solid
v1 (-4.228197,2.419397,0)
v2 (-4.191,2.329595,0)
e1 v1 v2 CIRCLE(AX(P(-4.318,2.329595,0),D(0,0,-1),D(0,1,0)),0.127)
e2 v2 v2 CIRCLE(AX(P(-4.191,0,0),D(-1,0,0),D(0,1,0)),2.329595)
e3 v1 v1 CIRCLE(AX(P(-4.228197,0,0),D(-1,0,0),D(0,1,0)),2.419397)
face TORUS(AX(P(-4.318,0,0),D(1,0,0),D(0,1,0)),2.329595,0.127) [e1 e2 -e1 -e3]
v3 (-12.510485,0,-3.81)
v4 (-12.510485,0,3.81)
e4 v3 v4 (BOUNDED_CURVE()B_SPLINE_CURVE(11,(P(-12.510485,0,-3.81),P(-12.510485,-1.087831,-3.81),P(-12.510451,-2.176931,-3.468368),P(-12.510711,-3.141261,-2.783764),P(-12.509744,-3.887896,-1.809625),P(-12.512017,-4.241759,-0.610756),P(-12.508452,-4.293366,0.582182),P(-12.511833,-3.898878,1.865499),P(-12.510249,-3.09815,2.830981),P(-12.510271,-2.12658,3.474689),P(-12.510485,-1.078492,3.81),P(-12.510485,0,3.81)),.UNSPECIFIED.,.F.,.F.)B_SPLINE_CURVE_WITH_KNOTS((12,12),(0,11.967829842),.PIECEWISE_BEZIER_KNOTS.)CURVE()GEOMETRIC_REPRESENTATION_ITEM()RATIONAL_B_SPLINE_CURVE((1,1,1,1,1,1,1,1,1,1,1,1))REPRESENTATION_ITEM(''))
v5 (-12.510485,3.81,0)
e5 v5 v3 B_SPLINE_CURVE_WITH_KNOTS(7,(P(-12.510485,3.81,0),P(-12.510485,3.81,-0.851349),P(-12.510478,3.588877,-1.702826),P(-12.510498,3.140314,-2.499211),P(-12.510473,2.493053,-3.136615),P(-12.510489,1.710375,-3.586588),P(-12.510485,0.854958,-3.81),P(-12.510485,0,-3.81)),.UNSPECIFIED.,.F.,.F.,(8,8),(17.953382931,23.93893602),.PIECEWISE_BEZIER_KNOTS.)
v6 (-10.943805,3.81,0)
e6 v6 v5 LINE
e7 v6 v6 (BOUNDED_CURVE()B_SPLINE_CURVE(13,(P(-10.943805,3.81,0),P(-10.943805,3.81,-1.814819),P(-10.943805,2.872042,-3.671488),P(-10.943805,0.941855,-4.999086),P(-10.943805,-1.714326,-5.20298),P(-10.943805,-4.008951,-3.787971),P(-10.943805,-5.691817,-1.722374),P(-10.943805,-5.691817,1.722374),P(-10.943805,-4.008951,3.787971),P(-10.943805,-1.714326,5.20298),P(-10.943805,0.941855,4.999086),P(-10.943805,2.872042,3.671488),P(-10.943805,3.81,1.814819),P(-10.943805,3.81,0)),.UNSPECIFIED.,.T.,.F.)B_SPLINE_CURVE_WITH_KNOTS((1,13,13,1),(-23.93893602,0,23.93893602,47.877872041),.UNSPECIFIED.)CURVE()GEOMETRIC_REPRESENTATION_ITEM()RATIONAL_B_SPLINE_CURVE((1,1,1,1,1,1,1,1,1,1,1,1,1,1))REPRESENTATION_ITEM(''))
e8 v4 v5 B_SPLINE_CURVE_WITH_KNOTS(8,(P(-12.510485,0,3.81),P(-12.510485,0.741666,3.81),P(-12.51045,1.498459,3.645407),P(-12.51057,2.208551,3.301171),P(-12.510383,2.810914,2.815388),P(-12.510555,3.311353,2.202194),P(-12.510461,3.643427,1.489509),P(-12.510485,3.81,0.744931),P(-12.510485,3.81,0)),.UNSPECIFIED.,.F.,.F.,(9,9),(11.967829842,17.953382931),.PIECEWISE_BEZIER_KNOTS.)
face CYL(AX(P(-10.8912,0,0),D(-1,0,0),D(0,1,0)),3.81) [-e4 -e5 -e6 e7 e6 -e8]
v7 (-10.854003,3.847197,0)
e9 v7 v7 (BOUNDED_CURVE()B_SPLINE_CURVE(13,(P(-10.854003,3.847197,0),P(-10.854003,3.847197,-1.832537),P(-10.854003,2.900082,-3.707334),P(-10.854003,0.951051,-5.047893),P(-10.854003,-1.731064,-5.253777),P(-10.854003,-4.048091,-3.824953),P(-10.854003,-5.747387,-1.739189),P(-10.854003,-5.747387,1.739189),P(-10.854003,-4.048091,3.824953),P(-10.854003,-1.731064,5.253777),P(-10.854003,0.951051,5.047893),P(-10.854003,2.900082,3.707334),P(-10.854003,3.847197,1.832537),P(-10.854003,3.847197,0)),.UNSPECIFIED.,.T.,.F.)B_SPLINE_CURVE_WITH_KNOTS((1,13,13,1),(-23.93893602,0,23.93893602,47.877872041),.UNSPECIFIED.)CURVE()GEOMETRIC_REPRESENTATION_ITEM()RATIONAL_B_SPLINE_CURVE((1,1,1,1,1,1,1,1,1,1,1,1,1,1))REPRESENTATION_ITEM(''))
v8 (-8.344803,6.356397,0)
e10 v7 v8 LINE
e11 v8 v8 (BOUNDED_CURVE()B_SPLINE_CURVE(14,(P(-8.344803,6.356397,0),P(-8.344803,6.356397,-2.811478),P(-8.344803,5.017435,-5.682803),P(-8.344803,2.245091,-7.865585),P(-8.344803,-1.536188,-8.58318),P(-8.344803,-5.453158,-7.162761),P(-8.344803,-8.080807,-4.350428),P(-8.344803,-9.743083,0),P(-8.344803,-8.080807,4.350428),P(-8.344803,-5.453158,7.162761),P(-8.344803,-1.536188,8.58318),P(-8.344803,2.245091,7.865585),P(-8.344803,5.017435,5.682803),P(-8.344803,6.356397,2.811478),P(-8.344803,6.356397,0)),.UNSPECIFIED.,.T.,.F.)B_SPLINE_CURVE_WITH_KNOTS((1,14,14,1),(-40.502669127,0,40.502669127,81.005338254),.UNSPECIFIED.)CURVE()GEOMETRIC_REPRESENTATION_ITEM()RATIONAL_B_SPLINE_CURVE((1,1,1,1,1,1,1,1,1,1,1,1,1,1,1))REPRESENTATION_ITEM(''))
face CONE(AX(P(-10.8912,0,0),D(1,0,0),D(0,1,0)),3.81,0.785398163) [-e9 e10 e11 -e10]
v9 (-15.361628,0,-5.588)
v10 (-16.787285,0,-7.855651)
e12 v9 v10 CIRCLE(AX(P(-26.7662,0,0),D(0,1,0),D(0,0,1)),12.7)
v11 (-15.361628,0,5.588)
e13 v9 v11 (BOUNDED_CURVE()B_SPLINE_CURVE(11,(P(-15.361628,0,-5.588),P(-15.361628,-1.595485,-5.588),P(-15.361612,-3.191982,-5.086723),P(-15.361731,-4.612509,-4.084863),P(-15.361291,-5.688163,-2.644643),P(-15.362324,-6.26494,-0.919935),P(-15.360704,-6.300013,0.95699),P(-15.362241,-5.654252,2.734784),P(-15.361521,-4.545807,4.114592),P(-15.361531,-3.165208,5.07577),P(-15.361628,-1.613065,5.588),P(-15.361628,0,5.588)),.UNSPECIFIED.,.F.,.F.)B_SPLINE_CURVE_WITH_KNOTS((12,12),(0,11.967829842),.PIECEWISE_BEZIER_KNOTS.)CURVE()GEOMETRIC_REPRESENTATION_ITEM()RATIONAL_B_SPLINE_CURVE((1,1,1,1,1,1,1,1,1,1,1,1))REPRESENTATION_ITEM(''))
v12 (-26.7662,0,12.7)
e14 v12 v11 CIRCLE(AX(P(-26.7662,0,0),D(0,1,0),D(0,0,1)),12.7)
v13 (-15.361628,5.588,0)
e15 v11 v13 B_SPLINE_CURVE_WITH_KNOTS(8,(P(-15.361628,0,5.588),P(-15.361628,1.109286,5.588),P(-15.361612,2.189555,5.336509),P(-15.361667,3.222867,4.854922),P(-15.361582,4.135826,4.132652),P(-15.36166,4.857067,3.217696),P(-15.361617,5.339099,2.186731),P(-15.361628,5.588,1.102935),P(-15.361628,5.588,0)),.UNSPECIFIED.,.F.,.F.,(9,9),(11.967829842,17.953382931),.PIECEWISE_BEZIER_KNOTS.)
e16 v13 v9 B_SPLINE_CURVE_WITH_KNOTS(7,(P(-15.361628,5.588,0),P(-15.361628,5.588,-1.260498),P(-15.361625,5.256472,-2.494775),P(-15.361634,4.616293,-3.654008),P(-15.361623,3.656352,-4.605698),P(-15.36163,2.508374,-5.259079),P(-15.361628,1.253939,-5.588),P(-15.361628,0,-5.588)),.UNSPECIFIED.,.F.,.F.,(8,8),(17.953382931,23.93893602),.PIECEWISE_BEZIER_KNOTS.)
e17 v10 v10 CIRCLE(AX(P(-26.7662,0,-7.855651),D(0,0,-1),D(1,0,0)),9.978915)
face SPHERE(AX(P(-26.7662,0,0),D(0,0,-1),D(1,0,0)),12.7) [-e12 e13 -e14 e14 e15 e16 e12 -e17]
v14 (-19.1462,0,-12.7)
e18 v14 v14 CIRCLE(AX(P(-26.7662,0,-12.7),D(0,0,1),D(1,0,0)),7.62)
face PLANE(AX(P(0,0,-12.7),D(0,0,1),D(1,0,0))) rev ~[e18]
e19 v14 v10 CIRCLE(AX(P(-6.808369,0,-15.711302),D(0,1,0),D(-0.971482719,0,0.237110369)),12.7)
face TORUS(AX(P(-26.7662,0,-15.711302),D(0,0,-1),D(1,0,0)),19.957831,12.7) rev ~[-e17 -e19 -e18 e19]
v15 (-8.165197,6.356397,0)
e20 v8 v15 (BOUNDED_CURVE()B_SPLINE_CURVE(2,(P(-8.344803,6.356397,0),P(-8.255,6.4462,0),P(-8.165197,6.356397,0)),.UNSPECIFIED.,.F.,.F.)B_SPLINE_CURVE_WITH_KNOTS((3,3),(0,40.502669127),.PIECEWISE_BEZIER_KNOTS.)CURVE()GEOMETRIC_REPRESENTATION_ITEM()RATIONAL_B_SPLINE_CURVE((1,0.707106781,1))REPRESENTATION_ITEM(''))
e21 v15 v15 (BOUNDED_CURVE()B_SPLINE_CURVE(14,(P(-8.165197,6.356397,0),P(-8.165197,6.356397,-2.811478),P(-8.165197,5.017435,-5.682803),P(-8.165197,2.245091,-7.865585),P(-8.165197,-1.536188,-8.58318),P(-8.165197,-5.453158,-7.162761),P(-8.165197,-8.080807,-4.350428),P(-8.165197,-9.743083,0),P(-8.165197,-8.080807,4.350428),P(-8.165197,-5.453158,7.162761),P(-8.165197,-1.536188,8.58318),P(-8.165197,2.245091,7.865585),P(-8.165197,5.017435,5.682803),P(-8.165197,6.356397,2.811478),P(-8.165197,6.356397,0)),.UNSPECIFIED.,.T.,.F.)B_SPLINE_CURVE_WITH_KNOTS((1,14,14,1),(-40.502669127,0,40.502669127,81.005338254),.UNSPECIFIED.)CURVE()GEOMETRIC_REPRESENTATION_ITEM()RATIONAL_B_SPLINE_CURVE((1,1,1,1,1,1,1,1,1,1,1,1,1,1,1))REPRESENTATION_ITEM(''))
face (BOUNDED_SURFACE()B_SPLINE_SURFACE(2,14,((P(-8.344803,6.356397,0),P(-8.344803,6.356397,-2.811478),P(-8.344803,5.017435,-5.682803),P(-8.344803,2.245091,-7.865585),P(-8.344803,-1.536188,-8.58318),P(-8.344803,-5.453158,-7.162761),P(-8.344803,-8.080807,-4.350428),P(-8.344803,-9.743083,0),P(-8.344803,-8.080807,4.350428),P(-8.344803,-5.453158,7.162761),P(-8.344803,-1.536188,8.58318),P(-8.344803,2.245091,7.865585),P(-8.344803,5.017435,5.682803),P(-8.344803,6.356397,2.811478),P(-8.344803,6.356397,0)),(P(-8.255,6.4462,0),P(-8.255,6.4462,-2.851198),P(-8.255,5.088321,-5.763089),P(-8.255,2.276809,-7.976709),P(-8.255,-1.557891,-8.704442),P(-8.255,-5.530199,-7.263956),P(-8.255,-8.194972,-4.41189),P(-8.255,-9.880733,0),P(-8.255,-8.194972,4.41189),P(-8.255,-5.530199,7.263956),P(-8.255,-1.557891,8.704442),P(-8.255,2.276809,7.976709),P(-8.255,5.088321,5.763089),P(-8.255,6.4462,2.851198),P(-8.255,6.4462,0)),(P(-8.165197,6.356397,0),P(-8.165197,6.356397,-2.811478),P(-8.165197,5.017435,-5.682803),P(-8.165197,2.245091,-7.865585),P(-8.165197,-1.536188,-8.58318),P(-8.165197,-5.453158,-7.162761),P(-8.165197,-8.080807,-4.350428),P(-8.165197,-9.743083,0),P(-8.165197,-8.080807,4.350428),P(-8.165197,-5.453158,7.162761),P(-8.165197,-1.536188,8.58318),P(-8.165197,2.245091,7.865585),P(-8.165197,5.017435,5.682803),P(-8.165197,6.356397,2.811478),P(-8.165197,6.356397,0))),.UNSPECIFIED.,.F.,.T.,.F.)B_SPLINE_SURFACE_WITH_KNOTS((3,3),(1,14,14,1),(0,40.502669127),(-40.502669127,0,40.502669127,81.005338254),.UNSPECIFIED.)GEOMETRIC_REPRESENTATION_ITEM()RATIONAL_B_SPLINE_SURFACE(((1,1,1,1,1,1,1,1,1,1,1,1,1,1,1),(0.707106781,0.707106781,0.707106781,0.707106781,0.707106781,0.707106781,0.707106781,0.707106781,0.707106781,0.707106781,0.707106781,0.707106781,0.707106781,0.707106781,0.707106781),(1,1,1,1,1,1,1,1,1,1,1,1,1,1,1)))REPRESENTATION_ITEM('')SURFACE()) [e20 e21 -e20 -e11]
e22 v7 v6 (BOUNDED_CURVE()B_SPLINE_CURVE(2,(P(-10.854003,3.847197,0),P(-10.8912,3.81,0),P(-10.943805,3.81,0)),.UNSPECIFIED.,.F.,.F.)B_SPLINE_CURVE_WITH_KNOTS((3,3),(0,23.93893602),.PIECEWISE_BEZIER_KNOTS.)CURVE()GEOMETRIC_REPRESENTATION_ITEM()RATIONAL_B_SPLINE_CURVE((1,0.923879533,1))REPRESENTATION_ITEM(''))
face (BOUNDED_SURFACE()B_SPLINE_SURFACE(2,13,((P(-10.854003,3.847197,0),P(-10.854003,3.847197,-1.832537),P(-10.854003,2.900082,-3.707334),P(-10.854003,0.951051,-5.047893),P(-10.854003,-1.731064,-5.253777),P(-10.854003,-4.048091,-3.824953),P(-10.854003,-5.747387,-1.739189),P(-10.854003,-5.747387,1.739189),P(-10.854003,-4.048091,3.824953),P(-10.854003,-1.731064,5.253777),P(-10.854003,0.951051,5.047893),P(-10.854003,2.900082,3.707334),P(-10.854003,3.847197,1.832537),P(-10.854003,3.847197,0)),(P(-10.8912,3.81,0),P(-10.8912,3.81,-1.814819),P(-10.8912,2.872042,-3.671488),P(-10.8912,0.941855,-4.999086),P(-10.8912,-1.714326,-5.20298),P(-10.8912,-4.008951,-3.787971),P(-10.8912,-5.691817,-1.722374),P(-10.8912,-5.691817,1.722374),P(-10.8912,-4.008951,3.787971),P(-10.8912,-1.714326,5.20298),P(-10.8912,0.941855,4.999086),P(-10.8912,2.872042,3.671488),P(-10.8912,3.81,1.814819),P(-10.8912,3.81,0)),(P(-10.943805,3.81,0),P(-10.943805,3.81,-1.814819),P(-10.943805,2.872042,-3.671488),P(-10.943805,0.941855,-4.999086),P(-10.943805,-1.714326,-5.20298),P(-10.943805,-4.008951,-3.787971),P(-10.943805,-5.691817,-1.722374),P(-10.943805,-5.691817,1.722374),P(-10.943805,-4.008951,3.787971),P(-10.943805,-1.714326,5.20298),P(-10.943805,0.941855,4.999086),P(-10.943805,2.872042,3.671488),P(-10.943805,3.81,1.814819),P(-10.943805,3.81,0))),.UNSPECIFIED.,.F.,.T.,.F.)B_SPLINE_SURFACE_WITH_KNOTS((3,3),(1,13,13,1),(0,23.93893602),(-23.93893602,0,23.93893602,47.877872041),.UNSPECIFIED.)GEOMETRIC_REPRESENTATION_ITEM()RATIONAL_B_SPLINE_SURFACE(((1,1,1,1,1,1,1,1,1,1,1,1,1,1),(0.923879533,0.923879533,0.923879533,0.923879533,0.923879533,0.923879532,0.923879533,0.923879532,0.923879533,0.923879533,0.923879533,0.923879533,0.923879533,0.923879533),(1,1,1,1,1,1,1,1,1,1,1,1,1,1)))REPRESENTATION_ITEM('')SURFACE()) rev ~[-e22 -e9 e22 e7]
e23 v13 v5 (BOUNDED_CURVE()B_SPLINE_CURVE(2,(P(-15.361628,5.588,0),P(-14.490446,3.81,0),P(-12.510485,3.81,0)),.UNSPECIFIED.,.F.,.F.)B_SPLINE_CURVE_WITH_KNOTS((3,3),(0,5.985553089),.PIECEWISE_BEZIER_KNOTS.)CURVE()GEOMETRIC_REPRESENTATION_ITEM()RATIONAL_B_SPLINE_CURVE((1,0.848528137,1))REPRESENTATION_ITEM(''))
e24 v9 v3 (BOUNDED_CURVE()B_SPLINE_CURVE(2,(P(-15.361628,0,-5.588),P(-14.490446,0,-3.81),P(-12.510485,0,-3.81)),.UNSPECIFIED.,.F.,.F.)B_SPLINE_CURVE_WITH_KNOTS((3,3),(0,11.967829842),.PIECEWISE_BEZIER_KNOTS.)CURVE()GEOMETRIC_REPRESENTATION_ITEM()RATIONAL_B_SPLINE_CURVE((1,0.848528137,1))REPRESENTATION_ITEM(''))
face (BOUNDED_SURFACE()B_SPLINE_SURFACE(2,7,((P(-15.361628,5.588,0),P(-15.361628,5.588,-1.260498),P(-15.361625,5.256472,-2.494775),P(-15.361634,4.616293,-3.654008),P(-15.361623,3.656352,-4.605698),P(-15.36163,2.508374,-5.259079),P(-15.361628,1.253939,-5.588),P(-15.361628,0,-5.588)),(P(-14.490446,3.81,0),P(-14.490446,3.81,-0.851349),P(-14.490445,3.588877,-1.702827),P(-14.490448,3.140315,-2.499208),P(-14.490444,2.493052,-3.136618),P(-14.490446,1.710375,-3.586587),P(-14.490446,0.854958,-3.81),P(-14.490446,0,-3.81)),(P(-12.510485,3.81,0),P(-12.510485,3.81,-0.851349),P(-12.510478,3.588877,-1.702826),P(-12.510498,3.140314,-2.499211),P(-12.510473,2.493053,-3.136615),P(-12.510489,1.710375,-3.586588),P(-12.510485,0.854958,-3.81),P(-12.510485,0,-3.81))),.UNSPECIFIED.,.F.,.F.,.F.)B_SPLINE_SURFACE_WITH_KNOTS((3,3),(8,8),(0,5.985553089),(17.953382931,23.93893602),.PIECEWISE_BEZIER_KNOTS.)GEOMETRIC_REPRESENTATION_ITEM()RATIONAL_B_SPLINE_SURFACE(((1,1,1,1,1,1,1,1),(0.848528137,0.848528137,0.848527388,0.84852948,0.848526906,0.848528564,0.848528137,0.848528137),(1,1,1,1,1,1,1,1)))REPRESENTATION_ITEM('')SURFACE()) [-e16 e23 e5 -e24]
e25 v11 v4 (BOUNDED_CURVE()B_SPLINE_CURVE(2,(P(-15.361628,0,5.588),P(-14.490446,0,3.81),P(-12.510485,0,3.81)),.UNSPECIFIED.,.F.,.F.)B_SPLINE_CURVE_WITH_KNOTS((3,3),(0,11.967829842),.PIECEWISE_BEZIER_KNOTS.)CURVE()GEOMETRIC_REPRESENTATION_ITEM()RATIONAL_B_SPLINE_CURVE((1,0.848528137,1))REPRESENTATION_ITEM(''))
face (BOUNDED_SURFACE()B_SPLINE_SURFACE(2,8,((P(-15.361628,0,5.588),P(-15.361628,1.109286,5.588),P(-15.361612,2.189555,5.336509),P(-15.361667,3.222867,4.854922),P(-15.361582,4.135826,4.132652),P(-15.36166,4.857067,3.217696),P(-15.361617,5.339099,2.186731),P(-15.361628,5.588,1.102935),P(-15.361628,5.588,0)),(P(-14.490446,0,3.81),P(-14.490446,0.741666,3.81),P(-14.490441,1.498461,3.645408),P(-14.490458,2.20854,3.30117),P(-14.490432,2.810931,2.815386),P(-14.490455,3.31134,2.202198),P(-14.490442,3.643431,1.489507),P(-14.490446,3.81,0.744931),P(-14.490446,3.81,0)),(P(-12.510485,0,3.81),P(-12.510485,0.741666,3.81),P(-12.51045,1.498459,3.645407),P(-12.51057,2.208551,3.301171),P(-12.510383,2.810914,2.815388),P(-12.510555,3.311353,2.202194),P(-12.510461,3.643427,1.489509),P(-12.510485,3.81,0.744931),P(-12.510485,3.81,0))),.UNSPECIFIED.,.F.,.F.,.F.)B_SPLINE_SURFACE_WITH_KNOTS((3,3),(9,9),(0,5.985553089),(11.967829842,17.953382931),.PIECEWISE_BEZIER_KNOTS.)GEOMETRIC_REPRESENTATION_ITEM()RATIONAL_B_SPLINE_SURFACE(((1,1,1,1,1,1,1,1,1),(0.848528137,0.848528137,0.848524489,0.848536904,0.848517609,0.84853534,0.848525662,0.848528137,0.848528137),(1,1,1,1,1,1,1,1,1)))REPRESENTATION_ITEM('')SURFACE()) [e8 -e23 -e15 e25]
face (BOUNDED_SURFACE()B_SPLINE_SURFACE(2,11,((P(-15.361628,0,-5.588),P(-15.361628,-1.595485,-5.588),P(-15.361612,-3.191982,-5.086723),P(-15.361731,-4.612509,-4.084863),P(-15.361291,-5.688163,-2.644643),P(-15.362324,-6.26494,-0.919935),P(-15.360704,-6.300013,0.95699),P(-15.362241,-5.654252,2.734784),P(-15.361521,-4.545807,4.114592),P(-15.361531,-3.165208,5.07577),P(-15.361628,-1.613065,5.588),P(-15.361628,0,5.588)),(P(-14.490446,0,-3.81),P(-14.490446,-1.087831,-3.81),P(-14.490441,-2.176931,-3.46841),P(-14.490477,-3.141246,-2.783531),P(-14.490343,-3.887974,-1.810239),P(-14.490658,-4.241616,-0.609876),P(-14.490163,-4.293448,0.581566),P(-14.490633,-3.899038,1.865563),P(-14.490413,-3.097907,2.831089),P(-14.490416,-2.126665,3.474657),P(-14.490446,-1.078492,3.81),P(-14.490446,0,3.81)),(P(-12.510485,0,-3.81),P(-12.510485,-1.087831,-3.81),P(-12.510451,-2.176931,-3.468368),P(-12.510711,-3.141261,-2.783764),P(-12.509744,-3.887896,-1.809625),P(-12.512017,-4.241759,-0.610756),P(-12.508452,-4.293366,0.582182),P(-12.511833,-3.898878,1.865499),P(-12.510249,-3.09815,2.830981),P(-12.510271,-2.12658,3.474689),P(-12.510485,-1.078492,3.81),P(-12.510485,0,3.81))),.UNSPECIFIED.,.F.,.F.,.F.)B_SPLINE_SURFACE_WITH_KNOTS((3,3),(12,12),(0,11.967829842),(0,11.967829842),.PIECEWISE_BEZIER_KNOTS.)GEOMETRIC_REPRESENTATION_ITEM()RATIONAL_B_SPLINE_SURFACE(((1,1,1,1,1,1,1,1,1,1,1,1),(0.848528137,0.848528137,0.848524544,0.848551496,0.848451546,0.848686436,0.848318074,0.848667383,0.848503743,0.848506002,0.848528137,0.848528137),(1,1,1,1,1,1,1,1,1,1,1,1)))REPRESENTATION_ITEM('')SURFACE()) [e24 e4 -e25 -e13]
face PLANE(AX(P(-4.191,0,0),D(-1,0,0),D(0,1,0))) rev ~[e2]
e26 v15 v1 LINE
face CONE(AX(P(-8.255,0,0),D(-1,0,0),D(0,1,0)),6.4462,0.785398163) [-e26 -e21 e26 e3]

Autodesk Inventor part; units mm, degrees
ref_plane "YZ Plane" through (0, 0, 0) normal (1, 0, 0) x (0, 1, 0)
ref_plane "XZ Plane" through (0, 0, 0) normal (0, 1, 0) x (-1, 0, 0)
sketch "Sketch3" plane through (0, 0, 0) normal (0, 0, 1) x (1, 0, 0)
  line L0 (-10.8841, 4.3559) -> (-10.16, 5.08)
  line L1 (-7.62, -2.54) -> (-10.16, -5.08)
  line L2 (-10.16, -5.08) -> (-10.8841, -4.3559)
  line L3 (-10.8912, 3.81) -> (-8.255, 6.4462)
  line L4 (-8.255, 6.4462) -> (-4.191, 2.3822)
  line L5 (-4.191, 2.3822) -> (-4.191, 0)
  line L6 (-4.191, 0) -> (-16.6062, 0)
  line L7 (-10.8912, 3.81) -> (-16.6062, 3.81)
  line L8 (-16.6062, 3.81) -> (-16.6062, 0)
  line L9 (-10.8841, 4.3559) -> (-9.525, 5.715)
  line L10 (-9.525, -5.715) -> (-10.8841, -4.3559)
  line L11 (-8.255, 6.985) -> (-3.81, 2.54)
  line L12 (-3.81, 2.54) -> (-3.81, -2.54)
  line L13 (-3.81, -2.54) -> (-8.255, -6.985)
  point P0 (0, 0)
  point P1 (-7.62, 0)
  dimension "d5" = 0.381
  dimension "d12" = 5.715
  dimension "d13" = 3.81
  dimension "d26" = 0.381
  dimension "d27" = 0.381
revolve "Revolution2" add sketch "Sketch3" angle 360 about axis through (-4.191, 0, 0) along (-1, 0, 0)
fillet "Fillet2" radius 0.127 3 edges at (-8.255, -6.4462, 0) (-10.8912, -3.81, 0) (-4.191, -2.3822, 0)
sketch "Sketch5" plane through (0, 0, 0) normal (0, 1, 0) x (-1, 0, 0)
  line L0 (16.6062, 3.81) -> (16.6062, -3.81) projected
  line L1 (16.6062, 3.81) -> (16.6062, -3.81) projected
  line L2 (10.9438, 3.81) -> (10.9438, -3.81) projected
  arc A0 (26.7662, 12.7) -> (26.7662, -12.7) centre (26.7662, 0) ccw
  line L3 (26.7662, 12.7) -> (26.7662, -12.7)
  point P0 (0, 0)
  dimension "d14" = 25.4
  dimension "d15" = 2.54
revolve "Revolution3" add sketch "Sketch5" angle 360 about axis through (-26.7662, 0, 12.7) along (0, 0, -1)
ref_plane "Work Plane1" through (0, 0, -12.7) normal (0, 0, 1) x (1, 0, 0)
sketch "Sketch8" plane through (0, 0, -12.7) normal (0, 0, 1) x (1, 0, 0)
  line L0 (-14.6512, -3.81) -> (-14.6512, 3.81) projected
  arc A0 (-14.6512, 3.81) -> (-14.6512, -3.81) centre (-26.7662, 0) ccw projected
  circle A1 centre (-26.7662, 0) radius 7.62
  arc A2 (-6.8635, -3.3102) -> (-6.8635, 3.3102) centre (0, 0) ccw projected
extrude "Extrusion1" add sketch "Sketch8" along normal up to next contours A1
fillet "Fillet3" radius 12.7 1 edges at (-34.3862, 0, -10.16)
fillet "Fillet4" radius 3.175 3 edges at (-14.6512, -3.81, 0) (-14.6512, 2.6939, 2.6943) (-14.6512, 2.6939, -2.6943)
equation "\"d26\" = d5"
equation "\"d27\" = d5"
properties part number "The Thing"
